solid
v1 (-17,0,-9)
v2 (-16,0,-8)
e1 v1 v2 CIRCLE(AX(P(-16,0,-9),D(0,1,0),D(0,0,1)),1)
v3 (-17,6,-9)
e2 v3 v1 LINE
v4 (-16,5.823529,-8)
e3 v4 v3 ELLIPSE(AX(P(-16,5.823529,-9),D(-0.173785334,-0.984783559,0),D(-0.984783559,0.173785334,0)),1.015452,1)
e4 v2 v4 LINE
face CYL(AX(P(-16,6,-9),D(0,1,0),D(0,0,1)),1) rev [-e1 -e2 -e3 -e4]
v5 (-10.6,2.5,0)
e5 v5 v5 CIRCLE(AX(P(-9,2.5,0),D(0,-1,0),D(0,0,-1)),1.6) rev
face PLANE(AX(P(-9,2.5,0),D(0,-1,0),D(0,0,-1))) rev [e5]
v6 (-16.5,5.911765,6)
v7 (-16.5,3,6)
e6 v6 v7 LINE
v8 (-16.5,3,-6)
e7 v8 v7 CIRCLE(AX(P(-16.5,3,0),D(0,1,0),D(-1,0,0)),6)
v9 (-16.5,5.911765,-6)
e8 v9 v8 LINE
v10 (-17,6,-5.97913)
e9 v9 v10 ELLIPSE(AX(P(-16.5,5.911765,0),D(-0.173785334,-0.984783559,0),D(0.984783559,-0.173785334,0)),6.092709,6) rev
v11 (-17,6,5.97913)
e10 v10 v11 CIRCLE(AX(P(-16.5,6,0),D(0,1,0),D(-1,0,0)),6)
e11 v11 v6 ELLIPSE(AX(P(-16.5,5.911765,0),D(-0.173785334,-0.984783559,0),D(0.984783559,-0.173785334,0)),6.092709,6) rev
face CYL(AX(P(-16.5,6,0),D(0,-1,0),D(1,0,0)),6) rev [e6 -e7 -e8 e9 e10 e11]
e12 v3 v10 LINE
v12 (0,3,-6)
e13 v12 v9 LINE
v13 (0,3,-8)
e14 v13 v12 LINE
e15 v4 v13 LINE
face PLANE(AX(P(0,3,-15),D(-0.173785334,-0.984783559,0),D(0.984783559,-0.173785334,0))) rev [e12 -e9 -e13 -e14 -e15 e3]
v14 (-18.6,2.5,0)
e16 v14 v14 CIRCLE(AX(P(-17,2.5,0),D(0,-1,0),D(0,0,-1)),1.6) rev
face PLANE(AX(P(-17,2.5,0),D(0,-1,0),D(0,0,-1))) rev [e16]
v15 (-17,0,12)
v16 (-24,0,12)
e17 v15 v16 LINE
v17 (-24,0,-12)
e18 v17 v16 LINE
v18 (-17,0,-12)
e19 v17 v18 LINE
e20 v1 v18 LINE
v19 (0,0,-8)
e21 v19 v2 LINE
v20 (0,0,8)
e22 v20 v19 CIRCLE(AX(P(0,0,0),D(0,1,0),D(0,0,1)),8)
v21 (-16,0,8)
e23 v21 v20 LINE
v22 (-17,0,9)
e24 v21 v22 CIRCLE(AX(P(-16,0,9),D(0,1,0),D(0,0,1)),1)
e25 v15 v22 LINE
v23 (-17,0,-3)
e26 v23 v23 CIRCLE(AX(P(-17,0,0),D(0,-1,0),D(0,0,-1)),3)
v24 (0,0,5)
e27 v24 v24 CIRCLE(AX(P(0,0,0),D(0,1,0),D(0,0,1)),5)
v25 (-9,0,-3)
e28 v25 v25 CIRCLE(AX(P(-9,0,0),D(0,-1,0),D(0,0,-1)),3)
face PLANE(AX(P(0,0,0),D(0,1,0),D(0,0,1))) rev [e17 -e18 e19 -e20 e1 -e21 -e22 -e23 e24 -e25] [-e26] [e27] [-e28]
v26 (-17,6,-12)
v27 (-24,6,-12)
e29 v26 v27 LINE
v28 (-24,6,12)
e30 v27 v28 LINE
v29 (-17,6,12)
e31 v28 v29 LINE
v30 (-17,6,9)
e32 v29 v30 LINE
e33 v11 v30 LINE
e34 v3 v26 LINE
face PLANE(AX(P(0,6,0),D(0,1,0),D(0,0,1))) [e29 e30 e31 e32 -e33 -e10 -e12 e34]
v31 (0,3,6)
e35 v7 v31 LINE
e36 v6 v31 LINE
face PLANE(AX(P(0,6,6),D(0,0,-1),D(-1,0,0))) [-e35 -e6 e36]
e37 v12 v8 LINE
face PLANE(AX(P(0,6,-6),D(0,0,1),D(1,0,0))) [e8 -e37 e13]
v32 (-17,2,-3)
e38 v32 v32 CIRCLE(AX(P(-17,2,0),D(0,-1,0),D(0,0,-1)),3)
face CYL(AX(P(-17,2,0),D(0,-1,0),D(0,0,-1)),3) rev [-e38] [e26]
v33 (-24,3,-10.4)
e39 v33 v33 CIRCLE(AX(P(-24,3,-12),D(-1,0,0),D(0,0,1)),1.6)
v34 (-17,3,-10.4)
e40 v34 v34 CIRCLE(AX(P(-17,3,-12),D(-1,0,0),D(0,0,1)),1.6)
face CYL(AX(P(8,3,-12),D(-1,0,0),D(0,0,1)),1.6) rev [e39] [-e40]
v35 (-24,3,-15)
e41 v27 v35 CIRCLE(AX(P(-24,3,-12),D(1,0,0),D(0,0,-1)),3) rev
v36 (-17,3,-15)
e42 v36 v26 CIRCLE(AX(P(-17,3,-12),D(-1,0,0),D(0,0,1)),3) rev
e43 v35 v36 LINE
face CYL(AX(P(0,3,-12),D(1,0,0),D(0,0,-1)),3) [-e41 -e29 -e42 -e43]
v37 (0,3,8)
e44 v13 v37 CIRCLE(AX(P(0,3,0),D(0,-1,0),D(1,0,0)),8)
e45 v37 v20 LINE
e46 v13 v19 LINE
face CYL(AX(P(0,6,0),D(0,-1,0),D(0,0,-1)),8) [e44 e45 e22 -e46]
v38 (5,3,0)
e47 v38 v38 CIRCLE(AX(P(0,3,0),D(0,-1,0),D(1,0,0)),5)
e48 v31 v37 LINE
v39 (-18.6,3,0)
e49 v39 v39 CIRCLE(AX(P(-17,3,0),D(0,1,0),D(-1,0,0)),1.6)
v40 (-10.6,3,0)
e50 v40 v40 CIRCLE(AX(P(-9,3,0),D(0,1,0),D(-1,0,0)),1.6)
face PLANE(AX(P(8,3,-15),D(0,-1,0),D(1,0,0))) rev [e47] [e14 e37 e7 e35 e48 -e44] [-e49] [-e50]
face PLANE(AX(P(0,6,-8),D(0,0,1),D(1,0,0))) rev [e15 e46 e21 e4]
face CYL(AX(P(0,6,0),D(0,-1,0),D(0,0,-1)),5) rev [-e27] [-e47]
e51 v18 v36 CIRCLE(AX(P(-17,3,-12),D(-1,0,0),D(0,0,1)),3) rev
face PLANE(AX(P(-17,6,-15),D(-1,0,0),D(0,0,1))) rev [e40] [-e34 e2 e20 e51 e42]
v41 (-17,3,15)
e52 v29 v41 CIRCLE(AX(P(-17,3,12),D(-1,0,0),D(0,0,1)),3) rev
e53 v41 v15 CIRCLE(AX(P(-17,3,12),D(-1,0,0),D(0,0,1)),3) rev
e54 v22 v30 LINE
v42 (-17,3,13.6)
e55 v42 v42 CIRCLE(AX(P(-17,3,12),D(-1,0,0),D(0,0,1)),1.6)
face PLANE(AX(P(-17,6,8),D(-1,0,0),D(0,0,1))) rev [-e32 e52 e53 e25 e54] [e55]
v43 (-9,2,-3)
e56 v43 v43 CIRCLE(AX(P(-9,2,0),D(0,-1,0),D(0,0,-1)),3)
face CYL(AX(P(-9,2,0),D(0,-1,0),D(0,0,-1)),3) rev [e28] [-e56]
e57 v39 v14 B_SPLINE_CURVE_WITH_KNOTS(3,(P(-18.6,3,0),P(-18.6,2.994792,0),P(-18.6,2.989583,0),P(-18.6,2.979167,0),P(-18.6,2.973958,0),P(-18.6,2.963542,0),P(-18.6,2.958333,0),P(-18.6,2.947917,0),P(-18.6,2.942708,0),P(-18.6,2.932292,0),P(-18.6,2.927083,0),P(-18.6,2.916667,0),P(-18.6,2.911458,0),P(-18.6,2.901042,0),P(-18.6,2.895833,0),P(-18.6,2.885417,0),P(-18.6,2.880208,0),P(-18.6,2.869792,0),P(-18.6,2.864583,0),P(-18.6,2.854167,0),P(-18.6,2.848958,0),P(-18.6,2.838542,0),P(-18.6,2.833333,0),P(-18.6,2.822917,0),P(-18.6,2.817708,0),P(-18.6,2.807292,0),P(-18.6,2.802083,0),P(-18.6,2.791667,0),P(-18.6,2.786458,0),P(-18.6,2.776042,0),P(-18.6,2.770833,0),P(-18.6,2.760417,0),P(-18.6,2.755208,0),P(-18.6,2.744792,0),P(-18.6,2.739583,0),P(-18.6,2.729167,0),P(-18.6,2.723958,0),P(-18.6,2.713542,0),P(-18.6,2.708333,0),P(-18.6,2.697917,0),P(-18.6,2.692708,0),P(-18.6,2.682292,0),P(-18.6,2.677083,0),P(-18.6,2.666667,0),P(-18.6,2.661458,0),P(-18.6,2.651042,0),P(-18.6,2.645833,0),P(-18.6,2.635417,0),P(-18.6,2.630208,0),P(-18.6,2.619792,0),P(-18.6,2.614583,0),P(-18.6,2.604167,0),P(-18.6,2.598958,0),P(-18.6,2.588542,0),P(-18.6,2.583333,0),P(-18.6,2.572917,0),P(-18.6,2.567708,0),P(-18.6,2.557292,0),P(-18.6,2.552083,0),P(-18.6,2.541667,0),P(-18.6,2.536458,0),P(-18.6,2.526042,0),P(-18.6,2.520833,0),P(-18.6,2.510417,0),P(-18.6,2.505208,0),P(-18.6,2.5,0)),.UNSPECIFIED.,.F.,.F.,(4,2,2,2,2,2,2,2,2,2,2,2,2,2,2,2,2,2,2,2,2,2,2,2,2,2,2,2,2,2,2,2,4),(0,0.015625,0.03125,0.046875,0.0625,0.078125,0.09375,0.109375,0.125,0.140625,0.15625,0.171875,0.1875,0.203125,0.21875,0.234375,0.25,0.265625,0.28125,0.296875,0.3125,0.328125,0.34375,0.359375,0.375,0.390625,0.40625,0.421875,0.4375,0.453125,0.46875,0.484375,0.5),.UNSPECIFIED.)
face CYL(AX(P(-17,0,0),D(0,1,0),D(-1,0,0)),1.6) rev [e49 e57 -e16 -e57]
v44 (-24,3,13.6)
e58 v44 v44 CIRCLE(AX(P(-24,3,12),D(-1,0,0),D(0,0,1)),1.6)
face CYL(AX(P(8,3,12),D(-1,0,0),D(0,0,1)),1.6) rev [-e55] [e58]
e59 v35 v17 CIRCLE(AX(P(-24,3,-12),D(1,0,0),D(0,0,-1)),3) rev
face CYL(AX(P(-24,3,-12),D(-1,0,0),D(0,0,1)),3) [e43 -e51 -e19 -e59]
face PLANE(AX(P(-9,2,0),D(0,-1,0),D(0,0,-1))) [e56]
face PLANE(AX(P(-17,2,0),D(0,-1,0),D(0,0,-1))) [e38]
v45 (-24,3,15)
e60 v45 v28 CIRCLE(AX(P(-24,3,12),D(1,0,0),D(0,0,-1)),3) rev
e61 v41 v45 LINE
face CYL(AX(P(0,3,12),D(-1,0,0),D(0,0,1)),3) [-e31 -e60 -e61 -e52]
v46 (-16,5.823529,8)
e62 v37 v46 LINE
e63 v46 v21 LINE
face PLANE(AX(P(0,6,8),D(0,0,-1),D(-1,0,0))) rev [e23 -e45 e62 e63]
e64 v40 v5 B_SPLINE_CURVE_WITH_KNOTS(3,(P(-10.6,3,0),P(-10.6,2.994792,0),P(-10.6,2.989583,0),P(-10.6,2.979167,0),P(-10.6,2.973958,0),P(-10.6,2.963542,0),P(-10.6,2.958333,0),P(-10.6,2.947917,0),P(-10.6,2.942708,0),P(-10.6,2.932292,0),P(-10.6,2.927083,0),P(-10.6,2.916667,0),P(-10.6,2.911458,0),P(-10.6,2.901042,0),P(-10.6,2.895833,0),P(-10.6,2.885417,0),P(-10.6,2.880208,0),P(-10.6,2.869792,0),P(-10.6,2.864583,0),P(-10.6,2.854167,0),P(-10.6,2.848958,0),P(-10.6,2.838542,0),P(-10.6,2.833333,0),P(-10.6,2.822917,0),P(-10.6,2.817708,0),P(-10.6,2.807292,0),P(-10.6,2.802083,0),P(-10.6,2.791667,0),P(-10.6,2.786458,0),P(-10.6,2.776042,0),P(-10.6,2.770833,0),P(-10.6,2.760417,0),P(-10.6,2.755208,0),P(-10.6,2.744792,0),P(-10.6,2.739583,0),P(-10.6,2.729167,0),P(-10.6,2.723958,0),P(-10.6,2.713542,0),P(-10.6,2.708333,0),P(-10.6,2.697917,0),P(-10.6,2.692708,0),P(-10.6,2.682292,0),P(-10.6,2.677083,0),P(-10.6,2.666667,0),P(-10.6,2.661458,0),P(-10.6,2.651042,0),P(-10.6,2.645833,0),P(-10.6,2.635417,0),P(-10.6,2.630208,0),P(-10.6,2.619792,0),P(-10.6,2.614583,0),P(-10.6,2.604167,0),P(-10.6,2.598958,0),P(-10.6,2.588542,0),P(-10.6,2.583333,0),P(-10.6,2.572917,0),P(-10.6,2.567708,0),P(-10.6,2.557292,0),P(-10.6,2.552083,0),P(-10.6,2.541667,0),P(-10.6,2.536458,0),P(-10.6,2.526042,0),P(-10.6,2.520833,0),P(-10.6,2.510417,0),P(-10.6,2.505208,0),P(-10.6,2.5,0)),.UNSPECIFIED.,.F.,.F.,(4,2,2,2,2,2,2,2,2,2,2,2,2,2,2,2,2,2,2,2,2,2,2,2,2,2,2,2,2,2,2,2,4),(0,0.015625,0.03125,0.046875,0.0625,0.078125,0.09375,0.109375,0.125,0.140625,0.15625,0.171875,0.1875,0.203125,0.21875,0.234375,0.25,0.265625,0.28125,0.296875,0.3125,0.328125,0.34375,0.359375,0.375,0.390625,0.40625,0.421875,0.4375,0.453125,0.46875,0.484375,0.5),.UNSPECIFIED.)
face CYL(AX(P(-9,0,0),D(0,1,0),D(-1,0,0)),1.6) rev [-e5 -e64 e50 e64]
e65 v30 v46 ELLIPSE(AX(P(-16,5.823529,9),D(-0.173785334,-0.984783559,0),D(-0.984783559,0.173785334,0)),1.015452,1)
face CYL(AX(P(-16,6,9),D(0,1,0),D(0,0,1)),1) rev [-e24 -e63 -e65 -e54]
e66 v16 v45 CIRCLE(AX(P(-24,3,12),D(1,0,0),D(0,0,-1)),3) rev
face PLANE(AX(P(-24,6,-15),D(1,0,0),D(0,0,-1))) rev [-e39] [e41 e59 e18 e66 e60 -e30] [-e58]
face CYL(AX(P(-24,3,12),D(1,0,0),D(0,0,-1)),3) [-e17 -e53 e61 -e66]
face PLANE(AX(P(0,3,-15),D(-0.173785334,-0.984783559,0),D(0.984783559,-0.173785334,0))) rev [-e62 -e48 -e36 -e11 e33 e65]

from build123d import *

# Parameters (mm, degrees)
SKETCH1_R               = 5
BOSS_EXTRUDE1_DEPTH     = 6
FILLET1_R               = 3
SKETCH2_R               = 1.6
CUT_EXTRUDE1_DEPTH      = 36.846896658
CUT_EXTRUDE2_DEPTH      = 29.930952283
CUT_EXTRUDE2_DEPTH_BACK = 29.930952283
CUT_EXTRUDE3_DEPTH      = 29.460498942
FILLET3_R               = 1
SKETCH5_R               = 1.6
CUT_EXTRUDE4_DEPTH      = 29.460498942
SKETCH6_R               = 3
CUT_EXTRUDE5_DEPTH      = 2
BOSS_EXTRUDE2_START     = -0.5
SKETCH7_R               = 1.6
BOSS_EXTRUDE2_DEPTH     = 0.5


with BuildPart() as part:
    # Sketch1 → Boss-Extrude1 (new body)
    with BuildSketch(Plane(origin=(0, 0, 0), x_dir=(1, 0, 0), z_dir=(0, 1, 0))):
        with BuildLine():
            Line((0, 8), (-17, 8))
            Line((-17, 8), (-17, 15))
            Line((-17, 15), (-24, 15))
            Line((-24, 15), (-24, -15))
            Line((-24, -15), (-17, -15))
            Line((-17, -15), (-17, -8))
            Line((-17, -8), (0, -8))
            ThreePointArc((0, -8), (8, 0), (0, 8))
        make_face()
        with Locations(Location((0, 0, 0), (0, 0, 270))):
            Circle(SKETCH1_R, mode=Mode.SUBTRACT)
    extrude(amount=BOSS_EXTRUDE1_DEPTH)

    # Fillet1
    fillet1_edges = [part.edges().sort_by_distance(p)[0] for p in [
        (-20.5, 0, -15),
        (-20.5, 6, -15),
        (-20.5, 0, 15),
        (-20.5, 6, 15),
    ]]
    fillet(fillet1_edges, radius=FILLET1_R - 0.0001)  # a hair under: the kernel refuses the full size

    # Sketch2 → Cut-Extrude1 (cut, through all)
    with BuildSketch(Plane.ZY.offset(24)):
        with Locations((-12, 3)):
            Circle(SKETCH2_R)
        with Locations((12, 3)):
            Circle(SKETCH2_R)
    extrude(amount=-CUT_EXTRUDE1_DEPTH, mode=Mode.SUBTRACT)

    # Sketch3 → Cut-Extrude2 (cut, two sides: drawn at the far end of the back side and taken through both)
    with BuildSketch(Plane.XY.offset(-CUT_EXTRUDE2_DEPTH_BACK)):
        Polygon((-17, 6), (8, 6), (8, 3), (0, 3), align=None)
    extrude(amount=CUT_EXTRUDE2_DEPTH + CUT_EXTRUDE2_DEPTH_BACK, mode=Mode.SUBTRACT)

    # Sketch4 → Cut-Extrude3 (cut, through all)
    with BuildSketch(Plane(origin=(0, 3, 0), x_dir=(1, 0, 0), z_dir=(0, 1, 0))):
        with BuildLine():
            Line((0, -6), (-16.5, -6))
            ThreePointArc((-16.5, -6), (-22.5, 0), (-16.5, 6))
            Line((-16.5, 6), (0, 6))
            ThreePointArc((0, 6), (6, 0), (0, -6))
        make_face()
    extrude(amount=CUT_EXTRUDE3_DEPTH, mode=Mode.SUBTRACT)

    # Fillet3
    fillet3_edges = [part.edges().sort_by_distance(p)[0] for p in [
        (-17, 3, -8),
        (-17, 3, 8),
    ]]
    fillet(fillet3_edges, radius=FILLET3_R)

    # Sketch5 → Cut-Extrude4 (cut, through all)
    with BuildSketch(Plane(origin=(0, 3, 0), x_dir=(1, 0, 0), z_dir=(0, 1, 0))):
        with Locations(Location((-9, 0, 0), (0, 0, 180))):
            Circle(SKETCH5_R)
        with Locations(Location((-17, 0, 0), (0, 0, 180))):
            Circle(SKETCH5_R)
    extrude(amount=-CUT_EXTRUDE4_DEPTH, mode=Mode.SUBTRACT)

    # Sketch6 → Cut-Extrude5 (cut)
    with BuildSketch(Plane.XZ):
        with Locations(Location((-17, 0, 0), (0, 0, 270))):
            Circle(SKETCH6_R)
        with Locations(Location((-9, 0, 0), (0, 0, 270))):
            Circle(SKETCH6_R)
    extrude(amount=-CUT_EXTRUDE5_DEPTH, mode=Mode.SUBTRACT)

    # Sketch7 → Boss-Extrude2 (add)
    with BuildSketch(Plane.XZ.offset(-2).offset(BOSS_EXTRUDE2_START)):
        with Locations(Location((-17, 0, 0), (0, 0, 180))):
            Circle(SKETCH7_R)
        with Locations(Location((-9, 0, 0), (0, 0, 180))):
            Circle(SKETCH7_R)
    extrude(amount=BOSS_EXTRUDE2_DEPTH)


solid = part.part
